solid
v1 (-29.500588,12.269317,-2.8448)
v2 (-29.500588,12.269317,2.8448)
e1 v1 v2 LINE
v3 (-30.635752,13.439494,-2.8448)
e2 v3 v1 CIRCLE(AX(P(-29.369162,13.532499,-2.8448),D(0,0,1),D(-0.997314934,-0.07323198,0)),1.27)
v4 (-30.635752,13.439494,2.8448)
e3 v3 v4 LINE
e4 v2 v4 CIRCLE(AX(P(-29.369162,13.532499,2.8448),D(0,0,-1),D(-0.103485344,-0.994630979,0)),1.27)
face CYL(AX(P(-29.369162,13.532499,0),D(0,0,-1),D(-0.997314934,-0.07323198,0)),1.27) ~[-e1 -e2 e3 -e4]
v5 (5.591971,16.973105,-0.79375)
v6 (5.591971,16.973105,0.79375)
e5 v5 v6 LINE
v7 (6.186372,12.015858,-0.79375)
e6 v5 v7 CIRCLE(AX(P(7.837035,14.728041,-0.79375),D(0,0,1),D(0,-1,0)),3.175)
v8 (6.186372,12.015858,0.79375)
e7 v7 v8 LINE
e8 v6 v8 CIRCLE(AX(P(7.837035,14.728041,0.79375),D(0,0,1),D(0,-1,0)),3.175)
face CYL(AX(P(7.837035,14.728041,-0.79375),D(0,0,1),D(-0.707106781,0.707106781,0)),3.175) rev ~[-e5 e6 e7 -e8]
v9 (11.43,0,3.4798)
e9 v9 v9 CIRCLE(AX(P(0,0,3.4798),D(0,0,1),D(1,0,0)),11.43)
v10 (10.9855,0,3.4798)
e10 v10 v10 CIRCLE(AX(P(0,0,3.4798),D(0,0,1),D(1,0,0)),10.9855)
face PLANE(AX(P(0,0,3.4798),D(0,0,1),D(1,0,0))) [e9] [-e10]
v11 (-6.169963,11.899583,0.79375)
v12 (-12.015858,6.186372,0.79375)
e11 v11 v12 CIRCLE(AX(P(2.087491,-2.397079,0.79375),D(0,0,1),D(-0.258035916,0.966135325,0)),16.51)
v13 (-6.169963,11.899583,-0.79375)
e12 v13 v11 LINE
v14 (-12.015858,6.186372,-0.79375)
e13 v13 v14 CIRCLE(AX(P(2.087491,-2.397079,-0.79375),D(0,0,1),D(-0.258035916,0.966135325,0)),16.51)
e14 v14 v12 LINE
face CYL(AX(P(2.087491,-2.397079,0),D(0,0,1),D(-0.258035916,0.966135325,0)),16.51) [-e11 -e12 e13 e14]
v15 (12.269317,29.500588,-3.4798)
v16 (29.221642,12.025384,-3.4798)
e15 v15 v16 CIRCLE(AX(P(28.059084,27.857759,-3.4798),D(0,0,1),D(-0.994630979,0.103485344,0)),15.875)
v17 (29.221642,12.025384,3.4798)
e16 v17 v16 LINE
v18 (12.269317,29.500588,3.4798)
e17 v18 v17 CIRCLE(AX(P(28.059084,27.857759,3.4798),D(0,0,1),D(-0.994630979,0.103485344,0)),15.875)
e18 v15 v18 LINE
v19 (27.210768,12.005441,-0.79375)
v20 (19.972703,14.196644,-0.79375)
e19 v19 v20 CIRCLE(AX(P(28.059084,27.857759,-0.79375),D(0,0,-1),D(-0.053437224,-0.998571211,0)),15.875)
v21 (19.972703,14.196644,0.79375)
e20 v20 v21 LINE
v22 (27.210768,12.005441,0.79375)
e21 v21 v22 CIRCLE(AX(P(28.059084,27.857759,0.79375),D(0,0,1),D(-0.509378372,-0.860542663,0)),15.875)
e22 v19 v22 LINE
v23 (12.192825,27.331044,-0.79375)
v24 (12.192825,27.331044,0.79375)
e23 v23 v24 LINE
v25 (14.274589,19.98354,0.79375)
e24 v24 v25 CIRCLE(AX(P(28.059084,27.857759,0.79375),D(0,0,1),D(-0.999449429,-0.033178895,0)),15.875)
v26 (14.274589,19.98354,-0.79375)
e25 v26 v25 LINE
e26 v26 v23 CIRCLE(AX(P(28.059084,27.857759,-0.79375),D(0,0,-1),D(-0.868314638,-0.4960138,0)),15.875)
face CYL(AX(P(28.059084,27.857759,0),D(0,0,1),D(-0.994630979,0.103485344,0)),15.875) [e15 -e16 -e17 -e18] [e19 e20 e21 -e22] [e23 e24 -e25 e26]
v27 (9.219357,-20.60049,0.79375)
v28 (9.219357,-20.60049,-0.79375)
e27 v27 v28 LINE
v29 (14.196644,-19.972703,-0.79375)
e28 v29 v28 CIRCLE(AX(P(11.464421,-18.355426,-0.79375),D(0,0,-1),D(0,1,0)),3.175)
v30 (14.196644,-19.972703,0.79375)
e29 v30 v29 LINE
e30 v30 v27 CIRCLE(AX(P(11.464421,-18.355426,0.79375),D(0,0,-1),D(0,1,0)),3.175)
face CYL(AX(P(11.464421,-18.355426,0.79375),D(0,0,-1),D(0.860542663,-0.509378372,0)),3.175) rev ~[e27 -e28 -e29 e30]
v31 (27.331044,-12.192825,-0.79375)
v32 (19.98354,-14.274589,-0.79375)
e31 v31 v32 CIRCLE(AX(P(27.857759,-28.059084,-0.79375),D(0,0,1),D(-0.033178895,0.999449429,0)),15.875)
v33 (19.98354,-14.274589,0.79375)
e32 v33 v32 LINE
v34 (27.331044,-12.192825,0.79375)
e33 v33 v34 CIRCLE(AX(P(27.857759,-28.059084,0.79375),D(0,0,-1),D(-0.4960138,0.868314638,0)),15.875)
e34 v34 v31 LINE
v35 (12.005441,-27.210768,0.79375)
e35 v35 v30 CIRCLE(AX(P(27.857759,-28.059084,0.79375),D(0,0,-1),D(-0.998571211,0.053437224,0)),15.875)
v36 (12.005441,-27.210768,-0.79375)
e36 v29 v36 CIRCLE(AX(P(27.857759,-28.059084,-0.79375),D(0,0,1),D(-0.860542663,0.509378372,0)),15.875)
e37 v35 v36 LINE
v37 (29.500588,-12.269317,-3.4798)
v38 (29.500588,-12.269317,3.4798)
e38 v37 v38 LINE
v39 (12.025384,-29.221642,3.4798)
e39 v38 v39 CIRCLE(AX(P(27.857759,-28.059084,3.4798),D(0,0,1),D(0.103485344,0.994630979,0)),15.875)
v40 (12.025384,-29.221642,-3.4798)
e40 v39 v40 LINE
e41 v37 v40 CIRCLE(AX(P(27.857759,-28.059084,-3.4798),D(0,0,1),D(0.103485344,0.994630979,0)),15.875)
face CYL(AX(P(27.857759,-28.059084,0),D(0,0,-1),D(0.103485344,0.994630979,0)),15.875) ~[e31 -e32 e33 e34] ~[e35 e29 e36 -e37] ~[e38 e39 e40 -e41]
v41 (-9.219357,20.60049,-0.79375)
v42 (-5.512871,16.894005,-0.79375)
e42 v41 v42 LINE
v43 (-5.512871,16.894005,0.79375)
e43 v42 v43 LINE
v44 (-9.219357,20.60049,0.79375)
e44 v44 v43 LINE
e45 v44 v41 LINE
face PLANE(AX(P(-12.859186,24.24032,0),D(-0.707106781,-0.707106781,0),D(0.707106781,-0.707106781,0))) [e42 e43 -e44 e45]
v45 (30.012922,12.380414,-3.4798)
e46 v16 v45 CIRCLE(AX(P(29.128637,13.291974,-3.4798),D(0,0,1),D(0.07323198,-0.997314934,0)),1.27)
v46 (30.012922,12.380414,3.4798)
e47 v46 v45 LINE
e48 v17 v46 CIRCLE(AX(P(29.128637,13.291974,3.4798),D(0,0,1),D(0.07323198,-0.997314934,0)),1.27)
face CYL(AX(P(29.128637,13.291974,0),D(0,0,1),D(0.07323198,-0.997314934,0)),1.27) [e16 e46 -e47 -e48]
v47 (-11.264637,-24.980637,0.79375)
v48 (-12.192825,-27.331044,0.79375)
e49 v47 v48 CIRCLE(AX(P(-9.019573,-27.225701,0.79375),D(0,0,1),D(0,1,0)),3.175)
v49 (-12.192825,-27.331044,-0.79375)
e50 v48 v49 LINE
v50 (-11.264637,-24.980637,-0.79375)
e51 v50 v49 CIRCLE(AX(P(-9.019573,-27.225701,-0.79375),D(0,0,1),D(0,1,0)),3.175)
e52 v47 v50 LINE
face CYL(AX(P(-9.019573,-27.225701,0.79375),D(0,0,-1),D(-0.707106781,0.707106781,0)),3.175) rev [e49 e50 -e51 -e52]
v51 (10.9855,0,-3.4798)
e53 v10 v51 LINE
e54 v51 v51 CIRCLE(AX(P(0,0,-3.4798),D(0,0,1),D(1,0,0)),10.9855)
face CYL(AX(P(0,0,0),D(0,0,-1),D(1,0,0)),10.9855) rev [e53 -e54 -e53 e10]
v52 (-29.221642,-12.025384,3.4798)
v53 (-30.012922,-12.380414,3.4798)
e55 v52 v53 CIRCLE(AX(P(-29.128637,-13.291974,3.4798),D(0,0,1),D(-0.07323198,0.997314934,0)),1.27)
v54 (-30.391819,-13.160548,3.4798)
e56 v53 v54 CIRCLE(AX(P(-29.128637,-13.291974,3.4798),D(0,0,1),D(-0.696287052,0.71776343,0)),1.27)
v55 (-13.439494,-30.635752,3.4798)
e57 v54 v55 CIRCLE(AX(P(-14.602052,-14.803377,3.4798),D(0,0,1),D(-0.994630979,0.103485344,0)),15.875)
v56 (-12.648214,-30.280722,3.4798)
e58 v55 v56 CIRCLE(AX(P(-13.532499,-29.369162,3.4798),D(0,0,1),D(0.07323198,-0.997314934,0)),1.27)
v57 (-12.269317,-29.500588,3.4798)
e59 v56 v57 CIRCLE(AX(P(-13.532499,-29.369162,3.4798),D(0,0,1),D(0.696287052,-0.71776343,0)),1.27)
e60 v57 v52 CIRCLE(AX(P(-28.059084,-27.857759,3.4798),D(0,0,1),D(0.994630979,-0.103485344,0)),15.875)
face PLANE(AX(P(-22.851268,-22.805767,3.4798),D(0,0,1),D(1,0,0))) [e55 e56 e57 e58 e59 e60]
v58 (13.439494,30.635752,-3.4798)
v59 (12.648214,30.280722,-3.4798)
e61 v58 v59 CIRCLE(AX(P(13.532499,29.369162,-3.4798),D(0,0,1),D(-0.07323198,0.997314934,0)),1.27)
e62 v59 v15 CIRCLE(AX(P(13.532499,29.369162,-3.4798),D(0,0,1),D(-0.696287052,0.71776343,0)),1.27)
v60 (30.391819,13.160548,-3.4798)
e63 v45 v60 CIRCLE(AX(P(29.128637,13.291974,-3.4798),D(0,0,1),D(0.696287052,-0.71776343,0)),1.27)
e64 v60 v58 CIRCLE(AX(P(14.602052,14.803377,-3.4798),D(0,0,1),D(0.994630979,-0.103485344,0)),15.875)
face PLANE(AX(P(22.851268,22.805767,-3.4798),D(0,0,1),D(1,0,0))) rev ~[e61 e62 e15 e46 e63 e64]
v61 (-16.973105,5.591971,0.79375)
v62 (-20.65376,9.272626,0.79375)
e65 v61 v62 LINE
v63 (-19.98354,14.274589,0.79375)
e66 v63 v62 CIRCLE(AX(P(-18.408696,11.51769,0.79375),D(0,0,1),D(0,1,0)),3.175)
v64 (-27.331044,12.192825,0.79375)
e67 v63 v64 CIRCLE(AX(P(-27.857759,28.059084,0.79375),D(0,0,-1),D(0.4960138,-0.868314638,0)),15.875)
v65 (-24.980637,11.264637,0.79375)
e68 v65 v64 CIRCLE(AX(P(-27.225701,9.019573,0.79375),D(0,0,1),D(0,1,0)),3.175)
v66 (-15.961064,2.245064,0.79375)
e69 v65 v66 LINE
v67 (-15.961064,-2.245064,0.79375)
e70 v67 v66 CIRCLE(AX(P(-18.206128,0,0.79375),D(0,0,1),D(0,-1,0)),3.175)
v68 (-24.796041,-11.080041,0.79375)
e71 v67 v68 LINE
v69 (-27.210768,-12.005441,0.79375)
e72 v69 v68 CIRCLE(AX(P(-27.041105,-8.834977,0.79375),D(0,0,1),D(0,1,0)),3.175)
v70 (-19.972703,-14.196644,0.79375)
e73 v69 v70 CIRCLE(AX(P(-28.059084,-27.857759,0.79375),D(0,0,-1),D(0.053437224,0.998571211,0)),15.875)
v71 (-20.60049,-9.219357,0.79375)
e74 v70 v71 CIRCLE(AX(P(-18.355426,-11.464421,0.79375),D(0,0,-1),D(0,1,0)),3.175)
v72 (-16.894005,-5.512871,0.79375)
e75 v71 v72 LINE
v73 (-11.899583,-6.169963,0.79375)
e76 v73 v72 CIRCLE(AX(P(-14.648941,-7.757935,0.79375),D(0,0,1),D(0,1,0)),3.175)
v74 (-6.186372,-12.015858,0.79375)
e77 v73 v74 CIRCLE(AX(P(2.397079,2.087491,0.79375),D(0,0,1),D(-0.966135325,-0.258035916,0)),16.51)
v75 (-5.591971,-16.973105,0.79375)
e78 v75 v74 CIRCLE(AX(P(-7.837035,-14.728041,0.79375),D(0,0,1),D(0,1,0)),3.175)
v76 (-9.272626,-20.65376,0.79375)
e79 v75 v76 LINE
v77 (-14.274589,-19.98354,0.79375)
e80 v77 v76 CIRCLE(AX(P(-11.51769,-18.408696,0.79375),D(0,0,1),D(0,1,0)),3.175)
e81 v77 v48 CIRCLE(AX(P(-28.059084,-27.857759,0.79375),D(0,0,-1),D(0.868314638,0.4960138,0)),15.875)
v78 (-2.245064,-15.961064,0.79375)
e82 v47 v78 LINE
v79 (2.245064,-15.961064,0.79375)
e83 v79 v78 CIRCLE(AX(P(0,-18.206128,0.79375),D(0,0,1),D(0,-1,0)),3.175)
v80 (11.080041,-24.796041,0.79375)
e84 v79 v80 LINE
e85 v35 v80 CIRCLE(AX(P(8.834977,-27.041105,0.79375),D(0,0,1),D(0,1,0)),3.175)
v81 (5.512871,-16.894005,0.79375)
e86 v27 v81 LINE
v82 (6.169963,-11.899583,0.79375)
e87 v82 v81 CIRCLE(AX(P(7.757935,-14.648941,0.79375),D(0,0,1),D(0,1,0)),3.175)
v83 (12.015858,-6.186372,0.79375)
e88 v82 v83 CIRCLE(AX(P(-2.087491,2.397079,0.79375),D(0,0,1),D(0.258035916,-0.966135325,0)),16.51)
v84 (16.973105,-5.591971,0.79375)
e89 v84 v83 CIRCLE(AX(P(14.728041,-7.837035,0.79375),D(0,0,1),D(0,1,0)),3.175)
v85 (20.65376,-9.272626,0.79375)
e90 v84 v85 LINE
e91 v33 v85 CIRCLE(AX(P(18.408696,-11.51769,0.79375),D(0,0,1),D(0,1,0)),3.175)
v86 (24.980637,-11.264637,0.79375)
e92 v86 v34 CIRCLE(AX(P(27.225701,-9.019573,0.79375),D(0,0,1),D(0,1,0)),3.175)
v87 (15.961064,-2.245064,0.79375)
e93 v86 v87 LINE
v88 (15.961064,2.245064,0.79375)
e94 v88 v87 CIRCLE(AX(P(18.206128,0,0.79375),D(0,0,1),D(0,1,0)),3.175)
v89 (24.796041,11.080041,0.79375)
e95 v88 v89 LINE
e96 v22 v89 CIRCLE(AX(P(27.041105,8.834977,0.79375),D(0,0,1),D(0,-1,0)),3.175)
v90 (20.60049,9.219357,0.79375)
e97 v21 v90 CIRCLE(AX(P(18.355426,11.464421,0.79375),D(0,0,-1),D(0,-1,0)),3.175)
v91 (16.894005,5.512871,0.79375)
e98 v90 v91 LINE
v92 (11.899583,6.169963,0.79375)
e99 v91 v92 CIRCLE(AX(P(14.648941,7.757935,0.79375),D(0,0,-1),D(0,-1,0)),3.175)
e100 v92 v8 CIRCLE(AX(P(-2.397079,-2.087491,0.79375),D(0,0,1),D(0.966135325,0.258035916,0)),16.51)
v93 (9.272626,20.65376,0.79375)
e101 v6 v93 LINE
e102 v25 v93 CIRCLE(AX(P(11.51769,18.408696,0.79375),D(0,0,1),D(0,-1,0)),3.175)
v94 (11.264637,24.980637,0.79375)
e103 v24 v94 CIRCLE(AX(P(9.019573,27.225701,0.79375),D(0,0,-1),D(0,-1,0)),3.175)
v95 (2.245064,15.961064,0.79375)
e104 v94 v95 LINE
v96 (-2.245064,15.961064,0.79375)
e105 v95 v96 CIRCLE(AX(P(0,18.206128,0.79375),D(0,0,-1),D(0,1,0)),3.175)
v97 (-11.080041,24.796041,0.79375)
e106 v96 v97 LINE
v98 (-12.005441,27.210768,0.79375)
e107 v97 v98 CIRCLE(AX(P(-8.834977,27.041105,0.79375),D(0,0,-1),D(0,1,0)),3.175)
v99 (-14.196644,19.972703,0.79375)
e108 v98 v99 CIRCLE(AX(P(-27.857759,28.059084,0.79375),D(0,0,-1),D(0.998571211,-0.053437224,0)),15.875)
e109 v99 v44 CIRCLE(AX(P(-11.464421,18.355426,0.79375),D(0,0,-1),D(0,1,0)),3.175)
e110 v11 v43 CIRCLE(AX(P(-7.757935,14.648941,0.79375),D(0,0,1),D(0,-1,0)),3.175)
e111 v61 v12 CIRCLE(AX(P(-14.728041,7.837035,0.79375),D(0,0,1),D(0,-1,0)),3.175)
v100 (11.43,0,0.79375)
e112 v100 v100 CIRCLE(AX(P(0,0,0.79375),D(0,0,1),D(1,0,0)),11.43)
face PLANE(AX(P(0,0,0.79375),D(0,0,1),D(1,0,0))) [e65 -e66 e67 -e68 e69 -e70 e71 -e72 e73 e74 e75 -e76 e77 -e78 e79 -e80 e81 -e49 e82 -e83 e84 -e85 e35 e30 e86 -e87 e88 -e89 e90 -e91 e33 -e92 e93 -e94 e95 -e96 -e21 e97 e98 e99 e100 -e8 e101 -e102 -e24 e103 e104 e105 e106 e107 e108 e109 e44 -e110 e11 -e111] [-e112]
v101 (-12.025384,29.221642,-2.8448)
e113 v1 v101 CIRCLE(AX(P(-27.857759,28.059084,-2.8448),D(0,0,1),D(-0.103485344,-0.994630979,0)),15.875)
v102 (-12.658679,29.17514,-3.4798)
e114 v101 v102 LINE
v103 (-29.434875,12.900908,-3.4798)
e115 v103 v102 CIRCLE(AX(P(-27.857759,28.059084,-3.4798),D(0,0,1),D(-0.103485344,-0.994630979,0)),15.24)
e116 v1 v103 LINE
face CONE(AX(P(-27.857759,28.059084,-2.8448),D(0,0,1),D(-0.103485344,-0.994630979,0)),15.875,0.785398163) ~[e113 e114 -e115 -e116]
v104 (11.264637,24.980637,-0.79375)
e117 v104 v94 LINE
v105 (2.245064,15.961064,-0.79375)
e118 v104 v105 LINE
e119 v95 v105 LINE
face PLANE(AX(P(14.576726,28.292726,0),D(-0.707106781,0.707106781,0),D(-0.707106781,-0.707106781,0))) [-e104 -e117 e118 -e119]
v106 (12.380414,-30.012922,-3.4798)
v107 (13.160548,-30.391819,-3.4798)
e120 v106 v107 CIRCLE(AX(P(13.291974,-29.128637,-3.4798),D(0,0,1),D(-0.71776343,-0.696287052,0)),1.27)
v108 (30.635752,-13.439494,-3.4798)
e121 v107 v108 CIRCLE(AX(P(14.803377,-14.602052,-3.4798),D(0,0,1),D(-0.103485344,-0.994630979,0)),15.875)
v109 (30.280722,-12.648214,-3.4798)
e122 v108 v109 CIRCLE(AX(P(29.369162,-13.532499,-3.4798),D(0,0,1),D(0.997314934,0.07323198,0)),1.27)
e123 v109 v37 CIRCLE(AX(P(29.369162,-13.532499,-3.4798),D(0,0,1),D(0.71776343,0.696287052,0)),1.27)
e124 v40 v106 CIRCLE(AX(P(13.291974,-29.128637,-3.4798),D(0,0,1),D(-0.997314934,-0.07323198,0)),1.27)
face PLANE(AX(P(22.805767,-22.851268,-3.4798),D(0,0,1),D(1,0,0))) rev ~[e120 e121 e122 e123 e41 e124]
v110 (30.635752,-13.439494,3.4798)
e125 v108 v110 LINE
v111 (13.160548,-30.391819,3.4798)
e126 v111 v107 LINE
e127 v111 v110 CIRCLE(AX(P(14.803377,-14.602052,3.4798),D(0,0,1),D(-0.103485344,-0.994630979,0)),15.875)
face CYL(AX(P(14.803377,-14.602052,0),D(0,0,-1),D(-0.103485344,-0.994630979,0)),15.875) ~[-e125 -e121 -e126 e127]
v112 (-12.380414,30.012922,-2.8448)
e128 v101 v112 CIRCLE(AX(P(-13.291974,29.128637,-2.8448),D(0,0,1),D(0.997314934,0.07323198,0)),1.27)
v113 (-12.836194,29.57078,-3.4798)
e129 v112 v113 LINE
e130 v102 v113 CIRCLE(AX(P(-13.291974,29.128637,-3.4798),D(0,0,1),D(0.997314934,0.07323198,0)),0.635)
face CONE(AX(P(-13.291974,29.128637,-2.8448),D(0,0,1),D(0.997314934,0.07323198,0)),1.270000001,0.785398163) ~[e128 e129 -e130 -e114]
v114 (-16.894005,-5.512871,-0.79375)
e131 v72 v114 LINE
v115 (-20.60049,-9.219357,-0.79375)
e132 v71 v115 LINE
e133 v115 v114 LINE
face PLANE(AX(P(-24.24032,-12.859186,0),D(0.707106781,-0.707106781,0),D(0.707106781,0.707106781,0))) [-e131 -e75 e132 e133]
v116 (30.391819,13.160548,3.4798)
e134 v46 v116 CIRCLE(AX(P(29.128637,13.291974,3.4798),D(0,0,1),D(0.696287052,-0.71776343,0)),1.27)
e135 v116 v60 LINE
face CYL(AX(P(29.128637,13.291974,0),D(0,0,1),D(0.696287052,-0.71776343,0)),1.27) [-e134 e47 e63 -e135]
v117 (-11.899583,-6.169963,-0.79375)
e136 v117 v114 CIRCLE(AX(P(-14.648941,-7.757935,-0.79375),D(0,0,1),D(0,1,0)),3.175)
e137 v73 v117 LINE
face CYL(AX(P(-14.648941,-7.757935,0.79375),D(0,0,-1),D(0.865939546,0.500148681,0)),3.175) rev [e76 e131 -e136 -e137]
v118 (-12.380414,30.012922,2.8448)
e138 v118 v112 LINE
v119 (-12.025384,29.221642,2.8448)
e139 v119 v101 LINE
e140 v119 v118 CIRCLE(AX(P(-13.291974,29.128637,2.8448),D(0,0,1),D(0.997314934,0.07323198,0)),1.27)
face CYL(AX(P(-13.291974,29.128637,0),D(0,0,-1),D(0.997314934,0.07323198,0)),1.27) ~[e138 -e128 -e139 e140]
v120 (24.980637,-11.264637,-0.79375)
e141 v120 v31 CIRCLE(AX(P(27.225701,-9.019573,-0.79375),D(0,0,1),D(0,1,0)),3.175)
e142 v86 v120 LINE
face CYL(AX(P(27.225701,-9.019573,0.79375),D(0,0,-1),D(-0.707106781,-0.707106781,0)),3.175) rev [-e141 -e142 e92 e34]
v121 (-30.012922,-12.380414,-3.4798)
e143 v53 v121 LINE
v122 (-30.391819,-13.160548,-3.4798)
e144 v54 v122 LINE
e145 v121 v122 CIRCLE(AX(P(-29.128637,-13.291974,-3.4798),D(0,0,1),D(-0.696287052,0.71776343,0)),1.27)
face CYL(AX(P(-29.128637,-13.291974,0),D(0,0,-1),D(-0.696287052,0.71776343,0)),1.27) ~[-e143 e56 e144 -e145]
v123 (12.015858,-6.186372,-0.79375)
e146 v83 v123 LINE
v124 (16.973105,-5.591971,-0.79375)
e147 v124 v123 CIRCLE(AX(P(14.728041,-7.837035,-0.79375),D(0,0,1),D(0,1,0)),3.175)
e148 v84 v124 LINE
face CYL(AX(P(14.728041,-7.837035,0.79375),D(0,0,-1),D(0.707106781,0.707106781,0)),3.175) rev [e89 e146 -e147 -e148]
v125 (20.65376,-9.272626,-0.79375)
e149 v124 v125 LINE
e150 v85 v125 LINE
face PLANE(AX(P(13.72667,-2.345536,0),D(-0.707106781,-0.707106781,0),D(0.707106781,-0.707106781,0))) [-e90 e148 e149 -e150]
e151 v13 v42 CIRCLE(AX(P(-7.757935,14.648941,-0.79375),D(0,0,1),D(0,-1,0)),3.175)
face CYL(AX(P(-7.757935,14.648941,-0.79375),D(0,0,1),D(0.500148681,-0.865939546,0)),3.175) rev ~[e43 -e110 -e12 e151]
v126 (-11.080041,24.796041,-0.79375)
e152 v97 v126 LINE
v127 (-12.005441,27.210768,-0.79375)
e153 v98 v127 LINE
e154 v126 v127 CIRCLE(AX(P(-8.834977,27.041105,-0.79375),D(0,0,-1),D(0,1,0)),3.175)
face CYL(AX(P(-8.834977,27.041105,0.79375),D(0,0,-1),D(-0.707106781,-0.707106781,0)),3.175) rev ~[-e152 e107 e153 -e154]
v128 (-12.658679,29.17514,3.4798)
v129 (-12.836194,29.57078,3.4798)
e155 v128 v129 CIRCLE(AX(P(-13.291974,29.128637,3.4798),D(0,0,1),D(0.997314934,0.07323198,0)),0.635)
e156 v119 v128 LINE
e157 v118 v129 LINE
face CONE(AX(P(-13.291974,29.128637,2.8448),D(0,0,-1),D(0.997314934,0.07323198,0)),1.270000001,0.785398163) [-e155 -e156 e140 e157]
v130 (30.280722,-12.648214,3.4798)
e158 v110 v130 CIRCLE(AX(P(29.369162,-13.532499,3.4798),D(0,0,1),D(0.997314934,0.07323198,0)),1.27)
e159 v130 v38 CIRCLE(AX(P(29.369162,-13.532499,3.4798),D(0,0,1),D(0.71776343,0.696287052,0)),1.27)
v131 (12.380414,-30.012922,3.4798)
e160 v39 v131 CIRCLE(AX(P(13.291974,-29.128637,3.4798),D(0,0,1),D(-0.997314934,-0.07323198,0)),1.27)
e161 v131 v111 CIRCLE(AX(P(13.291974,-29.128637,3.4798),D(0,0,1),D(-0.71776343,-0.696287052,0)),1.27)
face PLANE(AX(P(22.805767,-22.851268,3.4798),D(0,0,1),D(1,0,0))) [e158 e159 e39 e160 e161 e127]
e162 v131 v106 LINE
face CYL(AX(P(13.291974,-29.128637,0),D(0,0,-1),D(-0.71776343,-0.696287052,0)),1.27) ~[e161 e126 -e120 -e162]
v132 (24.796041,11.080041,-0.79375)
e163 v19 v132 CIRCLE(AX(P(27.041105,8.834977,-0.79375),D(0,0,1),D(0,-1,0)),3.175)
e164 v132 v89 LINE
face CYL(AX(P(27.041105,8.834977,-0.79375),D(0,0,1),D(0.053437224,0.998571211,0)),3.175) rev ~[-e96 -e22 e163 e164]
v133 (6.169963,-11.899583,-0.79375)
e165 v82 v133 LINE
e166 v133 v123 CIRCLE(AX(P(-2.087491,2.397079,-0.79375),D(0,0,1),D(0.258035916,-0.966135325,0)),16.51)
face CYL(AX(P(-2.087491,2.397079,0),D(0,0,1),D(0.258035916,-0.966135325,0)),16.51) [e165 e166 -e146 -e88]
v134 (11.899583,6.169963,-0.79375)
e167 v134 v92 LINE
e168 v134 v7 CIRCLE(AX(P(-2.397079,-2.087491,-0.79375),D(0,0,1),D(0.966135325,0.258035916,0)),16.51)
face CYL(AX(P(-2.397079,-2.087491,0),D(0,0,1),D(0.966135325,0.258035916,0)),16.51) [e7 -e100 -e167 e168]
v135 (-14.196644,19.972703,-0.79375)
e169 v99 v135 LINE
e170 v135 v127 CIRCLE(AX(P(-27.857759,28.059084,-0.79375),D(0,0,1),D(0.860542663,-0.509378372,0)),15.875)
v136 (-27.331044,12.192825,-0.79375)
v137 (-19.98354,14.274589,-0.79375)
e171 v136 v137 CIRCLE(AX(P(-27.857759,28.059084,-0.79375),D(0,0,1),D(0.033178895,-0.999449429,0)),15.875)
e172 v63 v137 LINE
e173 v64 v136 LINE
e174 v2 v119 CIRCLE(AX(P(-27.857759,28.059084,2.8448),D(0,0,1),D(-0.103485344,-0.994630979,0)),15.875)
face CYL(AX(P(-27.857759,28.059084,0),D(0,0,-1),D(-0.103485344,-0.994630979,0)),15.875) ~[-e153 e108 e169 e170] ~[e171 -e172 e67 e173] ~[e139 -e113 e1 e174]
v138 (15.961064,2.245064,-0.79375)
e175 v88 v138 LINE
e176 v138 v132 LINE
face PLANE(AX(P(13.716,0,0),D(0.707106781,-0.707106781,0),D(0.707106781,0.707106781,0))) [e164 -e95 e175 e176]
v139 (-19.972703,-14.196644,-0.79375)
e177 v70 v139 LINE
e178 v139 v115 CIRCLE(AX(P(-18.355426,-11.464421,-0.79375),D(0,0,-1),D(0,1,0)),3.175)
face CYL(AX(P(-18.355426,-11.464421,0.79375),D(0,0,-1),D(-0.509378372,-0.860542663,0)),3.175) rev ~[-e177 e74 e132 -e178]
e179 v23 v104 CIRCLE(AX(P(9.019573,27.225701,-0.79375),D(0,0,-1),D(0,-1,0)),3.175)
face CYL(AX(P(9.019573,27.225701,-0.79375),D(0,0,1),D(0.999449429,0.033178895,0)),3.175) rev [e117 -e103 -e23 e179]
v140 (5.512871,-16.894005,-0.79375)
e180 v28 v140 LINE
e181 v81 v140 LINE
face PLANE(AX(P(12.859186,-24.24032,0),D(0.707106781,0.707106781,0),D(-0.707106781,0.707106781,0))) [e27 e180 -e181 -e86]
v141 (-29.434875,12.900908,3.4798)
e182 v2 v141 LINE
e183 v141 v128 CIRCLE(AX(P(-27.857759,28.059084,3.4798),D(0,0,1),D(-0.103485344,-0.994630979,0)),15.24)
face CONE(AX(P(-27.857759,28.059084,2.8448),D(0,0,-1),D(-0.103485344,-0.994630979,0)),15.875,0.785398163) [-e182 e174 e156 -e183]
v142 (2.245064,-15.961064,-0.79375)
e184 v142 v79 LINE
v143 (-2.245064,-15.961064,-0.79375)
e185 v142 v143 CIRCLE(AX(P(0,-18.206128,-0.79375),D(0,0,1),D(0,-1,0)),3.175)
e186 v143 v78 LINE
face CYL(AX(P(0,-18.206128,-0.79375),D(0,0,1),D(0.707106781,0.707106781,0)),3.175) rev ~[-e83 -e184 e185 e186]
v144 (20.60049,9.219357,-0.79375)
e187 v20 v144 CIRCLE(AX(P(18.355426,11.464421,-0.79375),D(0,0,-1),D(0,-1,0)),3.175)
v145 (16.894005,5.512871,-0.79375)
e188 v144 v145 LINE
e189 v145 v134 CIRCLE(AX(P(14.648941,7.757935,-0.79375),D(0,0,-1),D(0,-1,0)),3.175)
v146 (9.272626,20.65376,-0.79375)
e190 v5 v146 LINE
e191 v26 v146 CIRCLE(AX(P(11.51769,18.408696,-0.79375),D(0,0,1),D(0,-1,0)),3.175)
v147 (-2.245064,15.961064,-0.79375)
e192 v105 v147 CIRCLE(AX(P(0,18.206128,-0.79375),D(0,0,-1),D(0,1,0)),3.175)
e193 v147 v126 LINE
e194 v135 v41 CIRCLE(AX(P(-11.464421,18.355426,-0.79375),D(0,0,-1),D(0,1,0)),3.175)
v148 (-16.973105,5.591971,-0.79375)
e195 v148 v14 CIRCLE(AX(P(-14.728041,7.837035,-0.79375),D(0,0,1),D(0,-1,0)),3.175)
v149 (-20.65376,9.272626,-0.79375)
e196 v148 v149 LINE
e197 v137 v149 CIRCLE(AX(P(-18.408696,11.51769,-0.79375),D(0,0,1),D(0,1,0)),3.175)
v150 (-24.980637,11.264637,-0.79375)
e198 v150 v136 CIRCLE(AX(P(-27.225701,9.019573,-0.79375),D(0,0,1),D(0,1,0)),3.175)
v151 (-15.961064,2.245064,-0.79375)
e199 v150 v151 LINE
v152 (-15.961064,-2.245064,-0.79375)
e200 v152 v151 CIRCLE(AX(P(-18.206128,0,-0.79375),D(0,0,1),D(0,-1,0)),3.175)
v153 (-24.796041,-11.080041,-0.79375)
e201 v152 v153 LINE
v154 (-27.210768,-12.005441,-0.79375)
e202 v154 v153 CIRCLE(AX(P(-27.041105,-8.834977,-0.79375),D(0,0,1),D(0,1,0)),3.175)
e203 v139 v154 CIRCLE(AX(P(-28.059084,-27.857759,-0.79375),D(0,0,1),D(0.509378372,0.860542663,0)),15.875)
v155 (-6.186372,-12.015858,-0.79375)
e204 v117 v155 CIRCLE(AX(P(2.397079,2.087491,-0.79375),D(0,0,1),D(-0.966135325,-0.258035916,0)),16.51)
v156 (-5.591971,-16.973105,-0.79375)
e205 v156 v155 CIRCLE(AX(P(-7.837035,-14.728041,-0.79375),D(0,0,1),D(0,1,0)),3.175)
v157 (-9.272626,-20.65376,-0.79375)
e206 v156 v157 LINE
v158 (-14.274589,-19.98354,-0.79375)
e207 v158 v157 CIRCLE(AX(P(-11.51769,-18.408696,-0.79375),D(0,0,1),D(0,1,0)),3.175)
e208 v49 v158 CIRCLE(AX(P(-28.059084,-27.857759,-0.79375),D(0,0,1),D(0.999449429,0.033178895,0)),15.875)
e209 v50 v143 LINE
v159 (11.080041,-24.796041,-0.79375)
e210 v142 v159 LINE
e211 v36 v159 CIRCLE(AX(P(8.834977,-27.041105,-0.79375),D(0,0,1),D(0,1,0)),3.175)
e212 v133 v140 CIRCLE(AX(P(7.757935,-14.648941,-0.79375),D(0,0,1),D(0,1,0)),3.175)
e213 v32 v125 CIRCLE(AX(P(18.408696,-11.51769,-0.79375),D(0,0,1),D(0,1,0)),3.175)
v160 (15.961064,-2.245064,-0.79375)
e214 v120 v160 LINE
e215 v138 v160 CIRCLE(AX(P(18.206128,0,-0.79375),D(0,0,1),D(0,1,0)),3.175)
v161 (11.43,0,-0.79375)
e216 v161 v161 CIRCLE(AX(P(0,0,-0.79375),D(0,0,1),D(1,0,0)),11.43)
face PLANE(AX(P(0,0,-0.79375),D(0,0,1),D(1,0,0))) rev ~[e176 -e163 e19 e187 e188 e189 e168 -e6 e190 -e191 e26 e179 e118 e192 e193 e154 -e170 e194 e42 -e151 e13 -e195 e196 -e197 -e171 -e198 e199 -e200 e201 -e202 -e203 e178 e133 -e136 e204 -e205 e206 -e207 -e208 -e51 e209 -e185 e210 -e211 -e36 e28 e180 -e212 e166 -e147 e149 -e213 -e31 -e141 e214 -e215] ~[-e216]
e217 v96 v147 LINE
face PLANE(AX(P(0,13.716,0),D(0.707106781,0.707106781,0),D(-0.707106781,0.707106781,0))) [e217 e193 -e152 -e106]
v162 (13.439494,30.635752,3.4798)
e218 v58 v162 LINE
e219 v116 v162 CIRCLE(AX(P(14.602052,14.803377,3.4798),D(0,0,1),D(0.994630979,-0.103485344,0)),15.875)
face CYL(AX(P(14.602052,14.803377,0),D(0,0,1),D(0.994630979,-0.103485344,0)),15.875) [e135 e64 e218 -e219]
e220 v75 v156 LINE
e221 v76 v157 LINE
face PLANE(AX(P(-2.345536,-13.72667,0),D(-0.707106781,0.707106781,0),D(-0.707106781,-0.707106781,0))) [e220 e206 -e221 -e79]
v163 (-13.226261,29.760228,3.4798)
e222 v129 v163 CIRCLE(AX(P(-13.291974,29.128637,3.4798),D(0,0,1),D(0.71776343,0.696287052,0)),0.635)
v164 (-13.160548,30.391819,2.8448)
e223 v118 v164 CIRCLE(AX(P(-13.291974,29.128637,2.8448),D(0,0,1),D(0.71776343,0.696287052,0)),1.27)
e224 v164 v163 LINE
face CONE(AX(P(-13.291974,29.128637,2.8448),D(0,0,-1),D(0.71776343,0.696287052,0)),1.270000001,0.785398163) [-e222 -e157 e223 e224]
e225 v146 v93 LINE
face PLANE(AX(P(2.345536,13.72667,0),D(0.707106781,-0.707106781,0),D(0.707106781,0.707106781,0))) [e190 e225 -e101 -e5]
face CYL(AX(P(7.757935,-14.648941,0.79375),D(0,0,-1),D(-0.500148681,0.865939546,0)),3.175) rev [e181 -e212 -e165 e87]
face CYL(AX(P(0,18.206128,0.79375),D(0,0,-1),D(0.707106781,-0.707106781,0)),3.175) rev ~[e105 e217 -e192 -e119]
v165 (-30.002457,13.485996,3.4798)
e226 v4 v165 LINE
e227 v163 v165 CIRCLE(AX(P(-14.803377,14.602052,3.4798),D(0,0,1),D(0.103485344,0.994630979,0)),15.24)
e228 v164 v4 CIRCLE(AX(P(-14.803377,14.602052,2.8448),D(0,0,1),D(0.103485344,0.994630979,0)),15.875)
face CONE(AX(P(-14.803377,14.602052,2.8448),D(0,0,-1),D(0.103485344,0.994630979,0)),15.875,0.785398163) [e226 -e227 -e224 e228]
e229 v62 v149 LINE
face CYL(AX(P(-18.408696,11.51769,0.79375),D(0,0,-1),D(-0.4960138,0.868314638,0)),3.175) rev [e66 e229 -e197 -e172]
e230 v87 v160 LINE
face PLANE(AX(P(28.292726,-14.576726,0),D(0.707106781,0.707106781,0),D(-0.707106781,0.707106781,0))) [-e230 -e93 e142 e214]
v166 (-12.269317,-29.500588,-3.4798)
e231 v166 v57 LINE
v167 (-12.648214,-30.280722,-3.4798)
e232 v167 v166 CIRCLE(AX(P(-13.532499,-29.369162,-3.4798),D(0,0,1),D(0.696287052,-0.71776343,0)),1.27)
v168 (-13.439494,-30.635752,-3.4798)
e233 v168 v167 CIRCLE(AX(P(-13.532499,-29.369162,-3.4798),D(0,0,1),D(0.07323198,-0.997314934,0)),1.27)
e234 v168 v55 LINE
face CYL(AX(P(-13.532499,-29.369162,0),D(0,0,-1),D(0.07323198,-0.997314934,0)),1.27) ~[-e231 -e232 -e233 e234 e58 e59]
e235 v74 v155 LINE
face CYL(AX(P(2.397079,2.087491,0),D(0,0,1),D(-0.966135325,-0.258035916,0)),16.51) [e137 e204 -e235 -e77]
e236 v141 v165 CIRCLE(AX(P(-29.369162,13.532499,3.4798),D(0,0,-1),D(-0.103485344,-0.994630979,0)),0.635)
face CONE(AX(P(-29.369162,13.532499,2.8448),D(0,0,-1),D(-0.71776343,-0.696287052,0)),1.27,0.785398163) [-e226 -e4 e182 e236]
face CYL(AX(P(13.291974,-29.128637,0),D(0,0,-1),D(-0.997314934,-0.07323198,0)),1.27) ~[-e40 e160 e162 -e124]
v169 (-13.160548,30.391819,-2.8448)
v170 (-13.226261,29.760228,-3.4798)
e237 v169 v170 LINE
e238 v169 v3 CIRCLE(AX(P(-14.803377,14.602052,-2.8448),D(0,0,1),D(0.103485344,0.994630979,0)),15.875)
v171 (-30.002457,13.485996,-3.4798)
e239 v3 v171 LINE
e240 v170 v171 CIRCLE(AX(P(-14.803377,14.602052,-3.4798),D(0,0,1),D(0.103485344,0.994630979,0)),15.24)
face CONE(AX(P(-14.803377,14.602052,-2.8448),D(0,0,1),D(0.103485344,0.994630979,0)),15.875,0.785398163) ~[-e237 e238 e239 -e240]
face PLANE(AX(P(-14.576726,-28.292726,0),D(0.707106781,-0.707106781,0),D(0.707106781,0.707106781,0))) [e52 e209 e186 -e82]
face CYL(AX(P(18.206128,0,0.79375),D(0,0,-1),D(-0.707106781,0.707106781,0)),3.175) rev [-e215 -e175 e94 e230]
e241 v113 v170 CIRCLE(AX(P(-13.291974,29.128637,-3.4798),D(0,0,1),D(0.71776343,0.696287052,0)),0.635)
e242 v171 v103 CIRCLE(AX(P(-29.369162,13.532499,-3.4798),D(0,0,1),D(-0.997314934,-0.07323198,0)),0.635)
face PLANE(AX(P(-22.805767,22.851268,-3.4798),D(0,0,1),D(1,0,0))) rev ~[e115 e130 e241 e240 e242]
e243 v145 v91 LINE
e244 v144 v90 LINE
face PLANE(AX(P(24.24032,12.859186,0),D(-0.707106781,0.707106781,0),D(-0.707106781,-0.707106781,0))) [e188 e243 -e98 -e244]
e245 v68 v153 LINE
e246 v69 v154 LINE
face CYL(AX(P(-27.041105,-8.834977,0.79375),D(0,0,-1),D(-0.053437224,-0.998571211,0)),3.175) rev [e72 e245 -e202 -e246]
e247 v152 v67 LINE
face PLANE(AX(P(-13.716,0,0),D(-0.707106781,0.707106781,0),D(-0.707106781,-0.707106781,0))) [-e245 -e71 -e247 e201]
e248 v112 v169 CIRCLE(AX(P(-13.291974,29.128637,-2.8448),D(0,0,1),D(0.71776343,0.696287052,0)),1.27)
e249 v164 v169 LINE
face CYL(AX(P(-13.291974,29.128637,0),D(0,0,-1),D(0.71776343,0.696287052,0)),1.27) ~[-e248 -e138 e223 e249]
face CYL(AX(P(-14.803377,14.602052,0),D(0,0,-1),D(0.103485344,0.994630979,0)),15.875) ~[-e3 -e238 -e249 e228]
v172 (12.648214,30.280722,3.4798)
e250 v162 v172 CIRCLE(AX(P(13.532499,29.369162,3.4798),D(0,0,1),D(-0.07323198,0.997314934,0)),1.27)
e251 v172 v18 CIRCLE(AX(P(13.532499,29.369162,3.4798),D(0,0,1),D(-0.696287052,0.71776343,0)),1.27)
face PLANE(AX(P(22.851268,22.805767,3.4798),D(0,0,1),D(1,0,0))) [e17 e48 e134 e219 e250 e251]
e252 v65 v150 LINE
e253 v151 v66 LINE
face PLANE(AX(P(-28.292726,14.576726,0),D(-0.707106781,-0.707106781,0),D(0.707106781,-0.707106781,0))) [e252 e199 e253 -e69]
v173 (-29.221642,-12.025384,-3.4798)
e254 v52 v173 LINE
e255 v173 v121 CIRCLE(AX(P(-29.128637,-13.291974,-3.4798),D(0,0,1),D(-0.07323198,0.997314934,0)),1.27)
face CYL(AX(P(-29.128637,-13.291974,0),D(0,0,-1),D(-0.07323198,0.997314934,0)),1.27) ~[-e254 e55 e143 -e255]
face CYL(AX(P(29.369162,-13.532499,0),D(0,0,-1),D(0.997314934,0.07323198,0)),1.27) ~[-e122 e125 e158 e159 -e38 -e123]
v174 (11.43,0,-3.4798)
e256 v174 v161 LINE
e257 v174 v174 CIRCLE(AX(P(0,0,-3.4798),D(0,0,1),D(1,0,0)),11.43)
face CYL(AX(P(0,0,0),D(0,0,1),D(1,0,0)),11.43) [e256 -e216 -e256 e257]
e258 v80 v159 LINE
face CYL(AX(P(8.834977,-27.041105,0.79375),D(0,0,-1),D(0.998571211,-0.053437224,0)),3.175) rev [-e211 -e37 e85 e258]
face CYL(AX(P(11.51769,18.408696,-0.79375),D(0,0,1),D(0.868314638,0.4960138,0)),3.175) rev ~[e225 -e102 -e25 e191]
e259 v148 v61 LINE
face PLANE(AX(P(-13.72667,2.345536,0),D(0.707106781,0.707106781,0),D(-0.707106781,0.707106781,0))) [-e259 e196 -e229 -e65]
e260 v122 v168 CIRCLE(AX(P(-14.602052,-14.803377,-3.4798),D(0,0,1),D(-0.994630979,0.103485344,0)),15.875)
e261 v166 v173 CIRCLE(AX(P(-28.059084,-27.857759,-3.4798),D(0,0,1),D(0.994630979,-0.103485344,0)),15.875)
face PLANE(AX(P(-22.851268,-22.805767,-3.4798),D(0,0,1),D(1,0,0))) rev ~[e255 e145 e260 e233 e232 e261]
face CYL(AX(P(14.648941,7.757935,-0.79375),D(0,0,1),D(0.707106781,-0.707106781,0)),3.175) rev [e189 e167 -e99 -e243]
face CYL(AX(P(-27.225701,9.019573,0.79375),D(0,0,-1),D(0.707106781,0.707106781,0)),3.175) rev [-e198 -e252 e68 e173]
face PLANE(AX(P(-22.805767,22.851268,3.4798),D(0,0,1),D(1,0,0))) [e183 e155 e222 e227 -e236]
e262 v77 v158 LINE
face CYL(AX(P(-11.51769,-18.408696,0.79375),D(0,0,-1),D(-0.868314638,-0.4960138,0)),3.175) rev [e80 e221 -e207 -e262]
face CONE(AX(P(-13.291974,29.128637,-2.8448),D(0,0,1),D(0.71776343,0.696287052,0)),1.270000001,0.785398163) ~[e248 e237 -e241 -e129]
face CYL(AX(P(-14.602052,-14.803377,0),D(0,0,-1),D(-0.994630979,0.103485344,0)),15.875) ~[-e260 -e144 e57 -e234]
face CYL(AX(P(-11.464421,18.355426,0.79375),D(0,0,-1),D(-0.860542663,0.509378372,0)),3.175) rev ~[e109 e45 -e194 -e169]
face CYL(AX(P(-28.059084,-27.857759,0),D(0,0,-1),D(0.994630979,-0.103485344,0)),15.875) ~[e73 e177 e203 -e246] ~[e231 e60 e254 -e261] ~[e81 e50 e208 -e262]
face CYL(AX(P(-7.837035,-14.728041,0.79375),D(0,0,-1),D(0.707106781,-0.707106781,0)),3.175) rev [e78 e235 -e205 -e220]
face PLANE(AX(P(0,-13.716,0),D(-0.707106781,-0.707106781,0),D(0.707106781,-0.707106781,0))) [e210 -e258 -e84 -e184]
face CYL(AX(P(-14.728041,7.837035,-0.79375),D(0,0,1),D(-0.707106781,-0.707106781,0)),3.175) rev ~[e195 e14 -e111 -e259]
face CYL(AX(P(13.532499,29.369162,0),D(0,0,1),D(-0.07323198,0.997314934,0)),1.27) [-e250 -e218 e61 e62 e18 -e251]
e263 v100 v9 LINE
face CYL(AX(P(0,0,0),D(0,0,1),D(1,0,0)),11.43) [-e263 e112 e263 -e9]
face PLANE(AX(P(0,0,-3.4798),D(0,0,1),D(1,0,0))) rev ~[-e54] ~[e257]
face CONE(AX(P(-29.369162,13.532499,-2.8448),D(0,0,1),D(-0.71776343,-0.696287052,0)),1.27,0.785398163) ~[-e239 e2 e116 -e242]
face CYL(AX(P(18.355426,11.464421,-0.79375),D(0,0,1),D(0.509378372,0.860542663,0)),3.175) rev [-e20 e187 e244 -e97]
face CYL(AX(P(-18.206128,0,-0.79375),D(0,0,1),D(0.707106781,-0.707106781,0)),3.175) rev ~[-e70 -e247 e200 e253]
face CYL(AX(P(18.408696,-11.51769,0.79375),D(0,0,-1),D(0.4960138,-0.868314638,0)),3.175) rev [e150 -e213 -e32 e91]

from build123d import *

# Parameters (mm, degrees)
F0_R     = 11.43
F1_DEPTH = 0.79375
F2_R     = 11.43
F2_R_2   = 10.9855
F3_DEPTH = 3.4798
F5_DEPTH = 3.4798
F6_R     = 3.175
F7_SIZE  = 0.635


# Not quite as in the source:
# - a feature names something its author has since deleted; it is built from what else it names


with BuildPart() as f1:
    # F0 (on Top) → F1 (new body, symmetric)
    with BuildSketch(Plane.XY):
        Polygon((-14.3684097937, 28.0844097937), (-28.2927262655, 14.5767262655), (-13.716, 0), (-28.0844097937, -14.3684097937), (-14.5767262655, -28.2927262655), (0, -13.716), (14.3684097937, -28.0844097937), (28.2927262655, -14.5767262655), (13.716, 0), (28.0844097937, 14.3684097937), (14.5767262655, 28.2927262655), (0, 13.716), align=None)
        with BuildLine():
            ThreePointArc((-13.0320412256, -24.4131746341), (-20.1396997698, -20.0947125947), (-24.2403197525, -12.8591863439))
            Line((-24.2403197525, -12.8591863439), (-13.5538149684, -2.1726815599))
            ThreePointArc((-13.5538149684, -2.1726815599), (-9.4531949857, -9.4082078106), (-2.3455364415, -13.72666985))
            Line((-2.3455364415, -13.72666985), (-13.0320412256, -24.4131746341))
        make_face(mode=Mode.SUBTRACT)
        with BuildLine():
            ThreePointArc((24.4131746341, -13.0320412256), (20.0947125947, -20.1396997698), (12.8591863439, -24.2403197525))
            Line((12.8591863439, -24.2403197525), (2.1726815599, -13.5538149684))
            ThreePointArc((2.1726815599, -13.5538149684), (9.4082078106, -9.4531949857), (13.72666985, -2.3455364415))
            Line((13.72666985, -2.3455364415), (24.4131746341, -13.0320412256))
        make_face(mode=Mode.SUBTRACT)
        Circle(F0_R, mode=Mode.SUBTRACT)
        with BuildLine():
            ThreePointArc((-2.1726815599, 13.5538149684), (-9.4082078106, 9.4531949857), (-13.72666985, 2.3455364415))
            Line((-13.72666985, 2.3455364415), (-24.4131746341, 13.0320412256))
            ThreePointArc((-24.4131746341, 13.0320412256), (-20.0947125947, 20.1396997698), (-12.8591863439, 24.2403197525))
            Line((-12.8591863439, 24.2403197525), (-2.1726815599, 13.5538149684))
        make_face(mode=Mode.SUBTRACT)
        with BuildLine():
            ThreePointArc((13.0320412256, 24.4131746341), (20.1396997698, 20.0947125947), (24.2403197525, 12.8591863439))
            Line((24.2403197525, 12.8591863439), (13.5538149684, 2.1726815599))
            ThreePointArc((13.5538149684, 2.1726815599), (9.4531949857, 9.4082078106), (2.3455364415, 13.72666985))
            Line((2.3455364415, 13.72666985), (13.0320412256, 24.4131746341))
        make_face(mode=Mode.SUBTRACT)
    extrude(amount=F1_DEPTH, both=True)

    # F2 (on Top) → F3 (join, symmetric)
    with BuildSketch(Plane.XY):
        Circle(F2_R)
        Circle(F2_R_2, mode=Mode.SUBTRACT)
    extrude(amount=F3_DEPTH, both=True)

    # F4 (on Top) → F5 (join, symmetric)
    with BuildSketch(Plane.XY):
        with BuildLine():
            ThreePointArc((-13.1605476158, 30.3918186243), (-25.856934394, 25.9965462925), (-30.6357520227, 13.4394941638))
            ThreePointArc((-30.6357520227, 13.4394941638), (-30.5278746276, 13.0126091951), (-30.2807216131, 12.6482142222))
            Line((-30.2807216131, 12.6482142222), (-12.3804144461, 30.0129218371))
            ThreePointArc((-12.3804144461, 30.0129218371), (-12.7371356357, 30.2710270515), (-13.1605476158, 30.3918186243))
        make_face()
        with BuildLine():
            Line((-12.3804144461, 30.0129218371), (-30.2807216131, 12.6482142222))
            ThreePointArc((-30.2807216131, 12.6482142222), (-29.9240004235, 12.3901090077), (-29.5005884435, 12.2693174349))
            ThreePointArc((-29.5005884435, 12.2693174349), (-16.8042016652, 16.6645897667), (-12.0253840365, 29.2216418954))
            ThreePointArc((-12.0253840365, 29.2216418954), (-12.1332614316, 29.6485268641), (-12.3804144461, 30.0129218371))
        make_face()
        with BuildLine():
            ThreePointArc((-30.3918186243, -13.1605476158), (-25.9965462925, -25.856934394), (-13.4394941638, -30.6357520227))
            ThreePointArc((-13.4394941638, -30.6357520227), (-13.0126091951, -30.5278746276), (-12.6482142222, -30.2807216131))
            Line((-12.6482142222, -30.2807216131), (-30.0129218371, -12.3804144461))
            ThreePointArc((-30.0129218371, -12.3804144461), (-30.2710270515, -12.7371356357), (-30.3918186243, -13.1605476158))
        make_face()
        with BuildLine():
            Line((-30.0129218371, -12.3804144461), (-12.6482142222, -30.2807216131))
            ThreePointArc((-12.6482142222, -30.2807216131), (-12.3901090077, -29.9240004235), (-12.2693174349, -29.5005884435))
            ThreePointArc((-12.2693174349, -29.5005884435), (-16.6645897667, -16.8042016652), (-29.2216418954, -12.0253840365))
            ThreePointArc((-29.2216418954, -12.0253840365), (-29.6485268641, -12.1332614316), (-30.0129218371, -12.3804144461))
        make_face()
        with BuildLine():
            ThreePointArc((13.1605476158, -30.3918186243), (25.856934394, -25.9965462925), (30.6357520227, -13.4394941638))
            ThreePointArc((30.6357520227, -13.4394941638), (30.5278746276, -13.0126091951), (30.2807216131, -12.6482142222))
            Line((30.2807216131, -12.6482142222), (12.3804144461, -30.0129218371))
            ThreePointArc((12.3804144461, -30.0129218371), (12.7371356357, -30.2710270515), (13.1605476158, -30.3918186243))
        make_face()
        with BuildLine():
            Line((12.3804144461, -30.0129218371), (30.2807216131, -12.6482142222))
            ThreePointArc((30.2807216131, -12.6482142222), (29.9240004235, -12.3901090077), (29.5005884435, -12.2693174349))
            ThreePointArc((29.5005884435, -12.2693174349), (16.8042016652, -16.6645897667), (12.0253840365, -29.2216418954))
            ThreePointArc((12.0253840365, -29.2216418954), (12.1332614316, -29.6485268641), (12.3804144461, -30.0129218371))
        make_face()
        with BuildLine():
            ThreePointArc((30.3918186243, 13.1605476158), (25.9965462925, 25.856934394), (13.4394941638, 30.6357520227))
            ThreePointArc((13.4394941638, 30.6357520227), (13.0126091951, 30.5278746276), (12.6482142222, 30.2807216131))
            Line((12.6482142222, 30.2807216131), (30.0129218371, 12.3804144461))
            ThreePointArc((30.0129218371, 12.3804144461), (30.2710270515, 12.7371356357), (30.3918186243, 13.1605476158))
        make_face()
        with BuildLine():
            Line((30.0129218371, 12.3804144461), (12.6482142222, 30.2807216131))
            ThreePointArc((12.6482142222, 30.2807216131), (12.3901090077, 29.9240004235), (12.2693174349, 29.5005884435))
            ThreePointArc((12.2693174349, 29.5005884435), (16.6645897667, 16.8042016652), (29.2216418954, 12.0253840365))
            ThreePointArc((29.2216418954, 12.0253840365), (29.6485268641, 12.1332614316), (30.0129218371, 12.3804144461))
        make_face()
    extrude(amount=F5_DEPTH, both=True)

    # F6
    f6_edges = [f1.edges().sort_by_distance(p)[0] for p in [
        (-26.008197, 12.292197, 0),
        (-12.533339, 23.914473, 0),
        (-24.032883, 12.65175, 0),
        (-12.136817, 25.852817, 0),
        (-2.172682, 13.553815, 0),
        (-13.72667, 2.345536, 0),
        (-13.716, 0, 0),
        (0, 13.716, 0),
        (2.345536, 13.72667, 0),
        (13.553815, 2.172682, 0),
        (13.716, 0, 0),
        (13.72667, -2.345536, 0),
        (2.172682, -13.553815, 0),
        (0, -13.716, 0),
        (-2.345536, -13.72667, 0),
        (-13.553815, -2.172682, 0),
        (12.292197, 26.008197, 0),
        (12.65175, 24.032883, 0),
        (25.852817, 12.136817, 0),
        (23.914473, 12.533339, 0),
        (26.008197, -12.292197, 0),
        (24.032883, -12.65175, 0),
        (12.136817, -25.852817, 0),
        (12.533339, -23.914473, 0),
        (-12.292197, -26.008197, 0),
        (-12.65175, -24.032883, 0),
        (-25.852817, -12.136817, 0),
        (-23.914473, -12.533339, 0),
    ]]
    fillet(f6_edges, radius=F6_R)

    # F7
    f7_edges = [f1.edges().sort_by_distance(p)[0] for p in [
        (-25.856934, 25.996546, 3.4798),
        (-30.280722, 12.648214, 3.4798),
        (-16.804202, 16.66459, 3.4798),
        (-12.380414, 30.012922, 3.4798),
        (-25.856934, 25.996546, -3.4798),
        (-30.280722, 12.648214, -3.4798),
        (-16.804202, 16.66459, -3.4798),
        (-12.380414, 30.012922, -3.4798),
    ]]
    chamfer(f7_edges, length=F7_SIZE)


solid = f1.part
